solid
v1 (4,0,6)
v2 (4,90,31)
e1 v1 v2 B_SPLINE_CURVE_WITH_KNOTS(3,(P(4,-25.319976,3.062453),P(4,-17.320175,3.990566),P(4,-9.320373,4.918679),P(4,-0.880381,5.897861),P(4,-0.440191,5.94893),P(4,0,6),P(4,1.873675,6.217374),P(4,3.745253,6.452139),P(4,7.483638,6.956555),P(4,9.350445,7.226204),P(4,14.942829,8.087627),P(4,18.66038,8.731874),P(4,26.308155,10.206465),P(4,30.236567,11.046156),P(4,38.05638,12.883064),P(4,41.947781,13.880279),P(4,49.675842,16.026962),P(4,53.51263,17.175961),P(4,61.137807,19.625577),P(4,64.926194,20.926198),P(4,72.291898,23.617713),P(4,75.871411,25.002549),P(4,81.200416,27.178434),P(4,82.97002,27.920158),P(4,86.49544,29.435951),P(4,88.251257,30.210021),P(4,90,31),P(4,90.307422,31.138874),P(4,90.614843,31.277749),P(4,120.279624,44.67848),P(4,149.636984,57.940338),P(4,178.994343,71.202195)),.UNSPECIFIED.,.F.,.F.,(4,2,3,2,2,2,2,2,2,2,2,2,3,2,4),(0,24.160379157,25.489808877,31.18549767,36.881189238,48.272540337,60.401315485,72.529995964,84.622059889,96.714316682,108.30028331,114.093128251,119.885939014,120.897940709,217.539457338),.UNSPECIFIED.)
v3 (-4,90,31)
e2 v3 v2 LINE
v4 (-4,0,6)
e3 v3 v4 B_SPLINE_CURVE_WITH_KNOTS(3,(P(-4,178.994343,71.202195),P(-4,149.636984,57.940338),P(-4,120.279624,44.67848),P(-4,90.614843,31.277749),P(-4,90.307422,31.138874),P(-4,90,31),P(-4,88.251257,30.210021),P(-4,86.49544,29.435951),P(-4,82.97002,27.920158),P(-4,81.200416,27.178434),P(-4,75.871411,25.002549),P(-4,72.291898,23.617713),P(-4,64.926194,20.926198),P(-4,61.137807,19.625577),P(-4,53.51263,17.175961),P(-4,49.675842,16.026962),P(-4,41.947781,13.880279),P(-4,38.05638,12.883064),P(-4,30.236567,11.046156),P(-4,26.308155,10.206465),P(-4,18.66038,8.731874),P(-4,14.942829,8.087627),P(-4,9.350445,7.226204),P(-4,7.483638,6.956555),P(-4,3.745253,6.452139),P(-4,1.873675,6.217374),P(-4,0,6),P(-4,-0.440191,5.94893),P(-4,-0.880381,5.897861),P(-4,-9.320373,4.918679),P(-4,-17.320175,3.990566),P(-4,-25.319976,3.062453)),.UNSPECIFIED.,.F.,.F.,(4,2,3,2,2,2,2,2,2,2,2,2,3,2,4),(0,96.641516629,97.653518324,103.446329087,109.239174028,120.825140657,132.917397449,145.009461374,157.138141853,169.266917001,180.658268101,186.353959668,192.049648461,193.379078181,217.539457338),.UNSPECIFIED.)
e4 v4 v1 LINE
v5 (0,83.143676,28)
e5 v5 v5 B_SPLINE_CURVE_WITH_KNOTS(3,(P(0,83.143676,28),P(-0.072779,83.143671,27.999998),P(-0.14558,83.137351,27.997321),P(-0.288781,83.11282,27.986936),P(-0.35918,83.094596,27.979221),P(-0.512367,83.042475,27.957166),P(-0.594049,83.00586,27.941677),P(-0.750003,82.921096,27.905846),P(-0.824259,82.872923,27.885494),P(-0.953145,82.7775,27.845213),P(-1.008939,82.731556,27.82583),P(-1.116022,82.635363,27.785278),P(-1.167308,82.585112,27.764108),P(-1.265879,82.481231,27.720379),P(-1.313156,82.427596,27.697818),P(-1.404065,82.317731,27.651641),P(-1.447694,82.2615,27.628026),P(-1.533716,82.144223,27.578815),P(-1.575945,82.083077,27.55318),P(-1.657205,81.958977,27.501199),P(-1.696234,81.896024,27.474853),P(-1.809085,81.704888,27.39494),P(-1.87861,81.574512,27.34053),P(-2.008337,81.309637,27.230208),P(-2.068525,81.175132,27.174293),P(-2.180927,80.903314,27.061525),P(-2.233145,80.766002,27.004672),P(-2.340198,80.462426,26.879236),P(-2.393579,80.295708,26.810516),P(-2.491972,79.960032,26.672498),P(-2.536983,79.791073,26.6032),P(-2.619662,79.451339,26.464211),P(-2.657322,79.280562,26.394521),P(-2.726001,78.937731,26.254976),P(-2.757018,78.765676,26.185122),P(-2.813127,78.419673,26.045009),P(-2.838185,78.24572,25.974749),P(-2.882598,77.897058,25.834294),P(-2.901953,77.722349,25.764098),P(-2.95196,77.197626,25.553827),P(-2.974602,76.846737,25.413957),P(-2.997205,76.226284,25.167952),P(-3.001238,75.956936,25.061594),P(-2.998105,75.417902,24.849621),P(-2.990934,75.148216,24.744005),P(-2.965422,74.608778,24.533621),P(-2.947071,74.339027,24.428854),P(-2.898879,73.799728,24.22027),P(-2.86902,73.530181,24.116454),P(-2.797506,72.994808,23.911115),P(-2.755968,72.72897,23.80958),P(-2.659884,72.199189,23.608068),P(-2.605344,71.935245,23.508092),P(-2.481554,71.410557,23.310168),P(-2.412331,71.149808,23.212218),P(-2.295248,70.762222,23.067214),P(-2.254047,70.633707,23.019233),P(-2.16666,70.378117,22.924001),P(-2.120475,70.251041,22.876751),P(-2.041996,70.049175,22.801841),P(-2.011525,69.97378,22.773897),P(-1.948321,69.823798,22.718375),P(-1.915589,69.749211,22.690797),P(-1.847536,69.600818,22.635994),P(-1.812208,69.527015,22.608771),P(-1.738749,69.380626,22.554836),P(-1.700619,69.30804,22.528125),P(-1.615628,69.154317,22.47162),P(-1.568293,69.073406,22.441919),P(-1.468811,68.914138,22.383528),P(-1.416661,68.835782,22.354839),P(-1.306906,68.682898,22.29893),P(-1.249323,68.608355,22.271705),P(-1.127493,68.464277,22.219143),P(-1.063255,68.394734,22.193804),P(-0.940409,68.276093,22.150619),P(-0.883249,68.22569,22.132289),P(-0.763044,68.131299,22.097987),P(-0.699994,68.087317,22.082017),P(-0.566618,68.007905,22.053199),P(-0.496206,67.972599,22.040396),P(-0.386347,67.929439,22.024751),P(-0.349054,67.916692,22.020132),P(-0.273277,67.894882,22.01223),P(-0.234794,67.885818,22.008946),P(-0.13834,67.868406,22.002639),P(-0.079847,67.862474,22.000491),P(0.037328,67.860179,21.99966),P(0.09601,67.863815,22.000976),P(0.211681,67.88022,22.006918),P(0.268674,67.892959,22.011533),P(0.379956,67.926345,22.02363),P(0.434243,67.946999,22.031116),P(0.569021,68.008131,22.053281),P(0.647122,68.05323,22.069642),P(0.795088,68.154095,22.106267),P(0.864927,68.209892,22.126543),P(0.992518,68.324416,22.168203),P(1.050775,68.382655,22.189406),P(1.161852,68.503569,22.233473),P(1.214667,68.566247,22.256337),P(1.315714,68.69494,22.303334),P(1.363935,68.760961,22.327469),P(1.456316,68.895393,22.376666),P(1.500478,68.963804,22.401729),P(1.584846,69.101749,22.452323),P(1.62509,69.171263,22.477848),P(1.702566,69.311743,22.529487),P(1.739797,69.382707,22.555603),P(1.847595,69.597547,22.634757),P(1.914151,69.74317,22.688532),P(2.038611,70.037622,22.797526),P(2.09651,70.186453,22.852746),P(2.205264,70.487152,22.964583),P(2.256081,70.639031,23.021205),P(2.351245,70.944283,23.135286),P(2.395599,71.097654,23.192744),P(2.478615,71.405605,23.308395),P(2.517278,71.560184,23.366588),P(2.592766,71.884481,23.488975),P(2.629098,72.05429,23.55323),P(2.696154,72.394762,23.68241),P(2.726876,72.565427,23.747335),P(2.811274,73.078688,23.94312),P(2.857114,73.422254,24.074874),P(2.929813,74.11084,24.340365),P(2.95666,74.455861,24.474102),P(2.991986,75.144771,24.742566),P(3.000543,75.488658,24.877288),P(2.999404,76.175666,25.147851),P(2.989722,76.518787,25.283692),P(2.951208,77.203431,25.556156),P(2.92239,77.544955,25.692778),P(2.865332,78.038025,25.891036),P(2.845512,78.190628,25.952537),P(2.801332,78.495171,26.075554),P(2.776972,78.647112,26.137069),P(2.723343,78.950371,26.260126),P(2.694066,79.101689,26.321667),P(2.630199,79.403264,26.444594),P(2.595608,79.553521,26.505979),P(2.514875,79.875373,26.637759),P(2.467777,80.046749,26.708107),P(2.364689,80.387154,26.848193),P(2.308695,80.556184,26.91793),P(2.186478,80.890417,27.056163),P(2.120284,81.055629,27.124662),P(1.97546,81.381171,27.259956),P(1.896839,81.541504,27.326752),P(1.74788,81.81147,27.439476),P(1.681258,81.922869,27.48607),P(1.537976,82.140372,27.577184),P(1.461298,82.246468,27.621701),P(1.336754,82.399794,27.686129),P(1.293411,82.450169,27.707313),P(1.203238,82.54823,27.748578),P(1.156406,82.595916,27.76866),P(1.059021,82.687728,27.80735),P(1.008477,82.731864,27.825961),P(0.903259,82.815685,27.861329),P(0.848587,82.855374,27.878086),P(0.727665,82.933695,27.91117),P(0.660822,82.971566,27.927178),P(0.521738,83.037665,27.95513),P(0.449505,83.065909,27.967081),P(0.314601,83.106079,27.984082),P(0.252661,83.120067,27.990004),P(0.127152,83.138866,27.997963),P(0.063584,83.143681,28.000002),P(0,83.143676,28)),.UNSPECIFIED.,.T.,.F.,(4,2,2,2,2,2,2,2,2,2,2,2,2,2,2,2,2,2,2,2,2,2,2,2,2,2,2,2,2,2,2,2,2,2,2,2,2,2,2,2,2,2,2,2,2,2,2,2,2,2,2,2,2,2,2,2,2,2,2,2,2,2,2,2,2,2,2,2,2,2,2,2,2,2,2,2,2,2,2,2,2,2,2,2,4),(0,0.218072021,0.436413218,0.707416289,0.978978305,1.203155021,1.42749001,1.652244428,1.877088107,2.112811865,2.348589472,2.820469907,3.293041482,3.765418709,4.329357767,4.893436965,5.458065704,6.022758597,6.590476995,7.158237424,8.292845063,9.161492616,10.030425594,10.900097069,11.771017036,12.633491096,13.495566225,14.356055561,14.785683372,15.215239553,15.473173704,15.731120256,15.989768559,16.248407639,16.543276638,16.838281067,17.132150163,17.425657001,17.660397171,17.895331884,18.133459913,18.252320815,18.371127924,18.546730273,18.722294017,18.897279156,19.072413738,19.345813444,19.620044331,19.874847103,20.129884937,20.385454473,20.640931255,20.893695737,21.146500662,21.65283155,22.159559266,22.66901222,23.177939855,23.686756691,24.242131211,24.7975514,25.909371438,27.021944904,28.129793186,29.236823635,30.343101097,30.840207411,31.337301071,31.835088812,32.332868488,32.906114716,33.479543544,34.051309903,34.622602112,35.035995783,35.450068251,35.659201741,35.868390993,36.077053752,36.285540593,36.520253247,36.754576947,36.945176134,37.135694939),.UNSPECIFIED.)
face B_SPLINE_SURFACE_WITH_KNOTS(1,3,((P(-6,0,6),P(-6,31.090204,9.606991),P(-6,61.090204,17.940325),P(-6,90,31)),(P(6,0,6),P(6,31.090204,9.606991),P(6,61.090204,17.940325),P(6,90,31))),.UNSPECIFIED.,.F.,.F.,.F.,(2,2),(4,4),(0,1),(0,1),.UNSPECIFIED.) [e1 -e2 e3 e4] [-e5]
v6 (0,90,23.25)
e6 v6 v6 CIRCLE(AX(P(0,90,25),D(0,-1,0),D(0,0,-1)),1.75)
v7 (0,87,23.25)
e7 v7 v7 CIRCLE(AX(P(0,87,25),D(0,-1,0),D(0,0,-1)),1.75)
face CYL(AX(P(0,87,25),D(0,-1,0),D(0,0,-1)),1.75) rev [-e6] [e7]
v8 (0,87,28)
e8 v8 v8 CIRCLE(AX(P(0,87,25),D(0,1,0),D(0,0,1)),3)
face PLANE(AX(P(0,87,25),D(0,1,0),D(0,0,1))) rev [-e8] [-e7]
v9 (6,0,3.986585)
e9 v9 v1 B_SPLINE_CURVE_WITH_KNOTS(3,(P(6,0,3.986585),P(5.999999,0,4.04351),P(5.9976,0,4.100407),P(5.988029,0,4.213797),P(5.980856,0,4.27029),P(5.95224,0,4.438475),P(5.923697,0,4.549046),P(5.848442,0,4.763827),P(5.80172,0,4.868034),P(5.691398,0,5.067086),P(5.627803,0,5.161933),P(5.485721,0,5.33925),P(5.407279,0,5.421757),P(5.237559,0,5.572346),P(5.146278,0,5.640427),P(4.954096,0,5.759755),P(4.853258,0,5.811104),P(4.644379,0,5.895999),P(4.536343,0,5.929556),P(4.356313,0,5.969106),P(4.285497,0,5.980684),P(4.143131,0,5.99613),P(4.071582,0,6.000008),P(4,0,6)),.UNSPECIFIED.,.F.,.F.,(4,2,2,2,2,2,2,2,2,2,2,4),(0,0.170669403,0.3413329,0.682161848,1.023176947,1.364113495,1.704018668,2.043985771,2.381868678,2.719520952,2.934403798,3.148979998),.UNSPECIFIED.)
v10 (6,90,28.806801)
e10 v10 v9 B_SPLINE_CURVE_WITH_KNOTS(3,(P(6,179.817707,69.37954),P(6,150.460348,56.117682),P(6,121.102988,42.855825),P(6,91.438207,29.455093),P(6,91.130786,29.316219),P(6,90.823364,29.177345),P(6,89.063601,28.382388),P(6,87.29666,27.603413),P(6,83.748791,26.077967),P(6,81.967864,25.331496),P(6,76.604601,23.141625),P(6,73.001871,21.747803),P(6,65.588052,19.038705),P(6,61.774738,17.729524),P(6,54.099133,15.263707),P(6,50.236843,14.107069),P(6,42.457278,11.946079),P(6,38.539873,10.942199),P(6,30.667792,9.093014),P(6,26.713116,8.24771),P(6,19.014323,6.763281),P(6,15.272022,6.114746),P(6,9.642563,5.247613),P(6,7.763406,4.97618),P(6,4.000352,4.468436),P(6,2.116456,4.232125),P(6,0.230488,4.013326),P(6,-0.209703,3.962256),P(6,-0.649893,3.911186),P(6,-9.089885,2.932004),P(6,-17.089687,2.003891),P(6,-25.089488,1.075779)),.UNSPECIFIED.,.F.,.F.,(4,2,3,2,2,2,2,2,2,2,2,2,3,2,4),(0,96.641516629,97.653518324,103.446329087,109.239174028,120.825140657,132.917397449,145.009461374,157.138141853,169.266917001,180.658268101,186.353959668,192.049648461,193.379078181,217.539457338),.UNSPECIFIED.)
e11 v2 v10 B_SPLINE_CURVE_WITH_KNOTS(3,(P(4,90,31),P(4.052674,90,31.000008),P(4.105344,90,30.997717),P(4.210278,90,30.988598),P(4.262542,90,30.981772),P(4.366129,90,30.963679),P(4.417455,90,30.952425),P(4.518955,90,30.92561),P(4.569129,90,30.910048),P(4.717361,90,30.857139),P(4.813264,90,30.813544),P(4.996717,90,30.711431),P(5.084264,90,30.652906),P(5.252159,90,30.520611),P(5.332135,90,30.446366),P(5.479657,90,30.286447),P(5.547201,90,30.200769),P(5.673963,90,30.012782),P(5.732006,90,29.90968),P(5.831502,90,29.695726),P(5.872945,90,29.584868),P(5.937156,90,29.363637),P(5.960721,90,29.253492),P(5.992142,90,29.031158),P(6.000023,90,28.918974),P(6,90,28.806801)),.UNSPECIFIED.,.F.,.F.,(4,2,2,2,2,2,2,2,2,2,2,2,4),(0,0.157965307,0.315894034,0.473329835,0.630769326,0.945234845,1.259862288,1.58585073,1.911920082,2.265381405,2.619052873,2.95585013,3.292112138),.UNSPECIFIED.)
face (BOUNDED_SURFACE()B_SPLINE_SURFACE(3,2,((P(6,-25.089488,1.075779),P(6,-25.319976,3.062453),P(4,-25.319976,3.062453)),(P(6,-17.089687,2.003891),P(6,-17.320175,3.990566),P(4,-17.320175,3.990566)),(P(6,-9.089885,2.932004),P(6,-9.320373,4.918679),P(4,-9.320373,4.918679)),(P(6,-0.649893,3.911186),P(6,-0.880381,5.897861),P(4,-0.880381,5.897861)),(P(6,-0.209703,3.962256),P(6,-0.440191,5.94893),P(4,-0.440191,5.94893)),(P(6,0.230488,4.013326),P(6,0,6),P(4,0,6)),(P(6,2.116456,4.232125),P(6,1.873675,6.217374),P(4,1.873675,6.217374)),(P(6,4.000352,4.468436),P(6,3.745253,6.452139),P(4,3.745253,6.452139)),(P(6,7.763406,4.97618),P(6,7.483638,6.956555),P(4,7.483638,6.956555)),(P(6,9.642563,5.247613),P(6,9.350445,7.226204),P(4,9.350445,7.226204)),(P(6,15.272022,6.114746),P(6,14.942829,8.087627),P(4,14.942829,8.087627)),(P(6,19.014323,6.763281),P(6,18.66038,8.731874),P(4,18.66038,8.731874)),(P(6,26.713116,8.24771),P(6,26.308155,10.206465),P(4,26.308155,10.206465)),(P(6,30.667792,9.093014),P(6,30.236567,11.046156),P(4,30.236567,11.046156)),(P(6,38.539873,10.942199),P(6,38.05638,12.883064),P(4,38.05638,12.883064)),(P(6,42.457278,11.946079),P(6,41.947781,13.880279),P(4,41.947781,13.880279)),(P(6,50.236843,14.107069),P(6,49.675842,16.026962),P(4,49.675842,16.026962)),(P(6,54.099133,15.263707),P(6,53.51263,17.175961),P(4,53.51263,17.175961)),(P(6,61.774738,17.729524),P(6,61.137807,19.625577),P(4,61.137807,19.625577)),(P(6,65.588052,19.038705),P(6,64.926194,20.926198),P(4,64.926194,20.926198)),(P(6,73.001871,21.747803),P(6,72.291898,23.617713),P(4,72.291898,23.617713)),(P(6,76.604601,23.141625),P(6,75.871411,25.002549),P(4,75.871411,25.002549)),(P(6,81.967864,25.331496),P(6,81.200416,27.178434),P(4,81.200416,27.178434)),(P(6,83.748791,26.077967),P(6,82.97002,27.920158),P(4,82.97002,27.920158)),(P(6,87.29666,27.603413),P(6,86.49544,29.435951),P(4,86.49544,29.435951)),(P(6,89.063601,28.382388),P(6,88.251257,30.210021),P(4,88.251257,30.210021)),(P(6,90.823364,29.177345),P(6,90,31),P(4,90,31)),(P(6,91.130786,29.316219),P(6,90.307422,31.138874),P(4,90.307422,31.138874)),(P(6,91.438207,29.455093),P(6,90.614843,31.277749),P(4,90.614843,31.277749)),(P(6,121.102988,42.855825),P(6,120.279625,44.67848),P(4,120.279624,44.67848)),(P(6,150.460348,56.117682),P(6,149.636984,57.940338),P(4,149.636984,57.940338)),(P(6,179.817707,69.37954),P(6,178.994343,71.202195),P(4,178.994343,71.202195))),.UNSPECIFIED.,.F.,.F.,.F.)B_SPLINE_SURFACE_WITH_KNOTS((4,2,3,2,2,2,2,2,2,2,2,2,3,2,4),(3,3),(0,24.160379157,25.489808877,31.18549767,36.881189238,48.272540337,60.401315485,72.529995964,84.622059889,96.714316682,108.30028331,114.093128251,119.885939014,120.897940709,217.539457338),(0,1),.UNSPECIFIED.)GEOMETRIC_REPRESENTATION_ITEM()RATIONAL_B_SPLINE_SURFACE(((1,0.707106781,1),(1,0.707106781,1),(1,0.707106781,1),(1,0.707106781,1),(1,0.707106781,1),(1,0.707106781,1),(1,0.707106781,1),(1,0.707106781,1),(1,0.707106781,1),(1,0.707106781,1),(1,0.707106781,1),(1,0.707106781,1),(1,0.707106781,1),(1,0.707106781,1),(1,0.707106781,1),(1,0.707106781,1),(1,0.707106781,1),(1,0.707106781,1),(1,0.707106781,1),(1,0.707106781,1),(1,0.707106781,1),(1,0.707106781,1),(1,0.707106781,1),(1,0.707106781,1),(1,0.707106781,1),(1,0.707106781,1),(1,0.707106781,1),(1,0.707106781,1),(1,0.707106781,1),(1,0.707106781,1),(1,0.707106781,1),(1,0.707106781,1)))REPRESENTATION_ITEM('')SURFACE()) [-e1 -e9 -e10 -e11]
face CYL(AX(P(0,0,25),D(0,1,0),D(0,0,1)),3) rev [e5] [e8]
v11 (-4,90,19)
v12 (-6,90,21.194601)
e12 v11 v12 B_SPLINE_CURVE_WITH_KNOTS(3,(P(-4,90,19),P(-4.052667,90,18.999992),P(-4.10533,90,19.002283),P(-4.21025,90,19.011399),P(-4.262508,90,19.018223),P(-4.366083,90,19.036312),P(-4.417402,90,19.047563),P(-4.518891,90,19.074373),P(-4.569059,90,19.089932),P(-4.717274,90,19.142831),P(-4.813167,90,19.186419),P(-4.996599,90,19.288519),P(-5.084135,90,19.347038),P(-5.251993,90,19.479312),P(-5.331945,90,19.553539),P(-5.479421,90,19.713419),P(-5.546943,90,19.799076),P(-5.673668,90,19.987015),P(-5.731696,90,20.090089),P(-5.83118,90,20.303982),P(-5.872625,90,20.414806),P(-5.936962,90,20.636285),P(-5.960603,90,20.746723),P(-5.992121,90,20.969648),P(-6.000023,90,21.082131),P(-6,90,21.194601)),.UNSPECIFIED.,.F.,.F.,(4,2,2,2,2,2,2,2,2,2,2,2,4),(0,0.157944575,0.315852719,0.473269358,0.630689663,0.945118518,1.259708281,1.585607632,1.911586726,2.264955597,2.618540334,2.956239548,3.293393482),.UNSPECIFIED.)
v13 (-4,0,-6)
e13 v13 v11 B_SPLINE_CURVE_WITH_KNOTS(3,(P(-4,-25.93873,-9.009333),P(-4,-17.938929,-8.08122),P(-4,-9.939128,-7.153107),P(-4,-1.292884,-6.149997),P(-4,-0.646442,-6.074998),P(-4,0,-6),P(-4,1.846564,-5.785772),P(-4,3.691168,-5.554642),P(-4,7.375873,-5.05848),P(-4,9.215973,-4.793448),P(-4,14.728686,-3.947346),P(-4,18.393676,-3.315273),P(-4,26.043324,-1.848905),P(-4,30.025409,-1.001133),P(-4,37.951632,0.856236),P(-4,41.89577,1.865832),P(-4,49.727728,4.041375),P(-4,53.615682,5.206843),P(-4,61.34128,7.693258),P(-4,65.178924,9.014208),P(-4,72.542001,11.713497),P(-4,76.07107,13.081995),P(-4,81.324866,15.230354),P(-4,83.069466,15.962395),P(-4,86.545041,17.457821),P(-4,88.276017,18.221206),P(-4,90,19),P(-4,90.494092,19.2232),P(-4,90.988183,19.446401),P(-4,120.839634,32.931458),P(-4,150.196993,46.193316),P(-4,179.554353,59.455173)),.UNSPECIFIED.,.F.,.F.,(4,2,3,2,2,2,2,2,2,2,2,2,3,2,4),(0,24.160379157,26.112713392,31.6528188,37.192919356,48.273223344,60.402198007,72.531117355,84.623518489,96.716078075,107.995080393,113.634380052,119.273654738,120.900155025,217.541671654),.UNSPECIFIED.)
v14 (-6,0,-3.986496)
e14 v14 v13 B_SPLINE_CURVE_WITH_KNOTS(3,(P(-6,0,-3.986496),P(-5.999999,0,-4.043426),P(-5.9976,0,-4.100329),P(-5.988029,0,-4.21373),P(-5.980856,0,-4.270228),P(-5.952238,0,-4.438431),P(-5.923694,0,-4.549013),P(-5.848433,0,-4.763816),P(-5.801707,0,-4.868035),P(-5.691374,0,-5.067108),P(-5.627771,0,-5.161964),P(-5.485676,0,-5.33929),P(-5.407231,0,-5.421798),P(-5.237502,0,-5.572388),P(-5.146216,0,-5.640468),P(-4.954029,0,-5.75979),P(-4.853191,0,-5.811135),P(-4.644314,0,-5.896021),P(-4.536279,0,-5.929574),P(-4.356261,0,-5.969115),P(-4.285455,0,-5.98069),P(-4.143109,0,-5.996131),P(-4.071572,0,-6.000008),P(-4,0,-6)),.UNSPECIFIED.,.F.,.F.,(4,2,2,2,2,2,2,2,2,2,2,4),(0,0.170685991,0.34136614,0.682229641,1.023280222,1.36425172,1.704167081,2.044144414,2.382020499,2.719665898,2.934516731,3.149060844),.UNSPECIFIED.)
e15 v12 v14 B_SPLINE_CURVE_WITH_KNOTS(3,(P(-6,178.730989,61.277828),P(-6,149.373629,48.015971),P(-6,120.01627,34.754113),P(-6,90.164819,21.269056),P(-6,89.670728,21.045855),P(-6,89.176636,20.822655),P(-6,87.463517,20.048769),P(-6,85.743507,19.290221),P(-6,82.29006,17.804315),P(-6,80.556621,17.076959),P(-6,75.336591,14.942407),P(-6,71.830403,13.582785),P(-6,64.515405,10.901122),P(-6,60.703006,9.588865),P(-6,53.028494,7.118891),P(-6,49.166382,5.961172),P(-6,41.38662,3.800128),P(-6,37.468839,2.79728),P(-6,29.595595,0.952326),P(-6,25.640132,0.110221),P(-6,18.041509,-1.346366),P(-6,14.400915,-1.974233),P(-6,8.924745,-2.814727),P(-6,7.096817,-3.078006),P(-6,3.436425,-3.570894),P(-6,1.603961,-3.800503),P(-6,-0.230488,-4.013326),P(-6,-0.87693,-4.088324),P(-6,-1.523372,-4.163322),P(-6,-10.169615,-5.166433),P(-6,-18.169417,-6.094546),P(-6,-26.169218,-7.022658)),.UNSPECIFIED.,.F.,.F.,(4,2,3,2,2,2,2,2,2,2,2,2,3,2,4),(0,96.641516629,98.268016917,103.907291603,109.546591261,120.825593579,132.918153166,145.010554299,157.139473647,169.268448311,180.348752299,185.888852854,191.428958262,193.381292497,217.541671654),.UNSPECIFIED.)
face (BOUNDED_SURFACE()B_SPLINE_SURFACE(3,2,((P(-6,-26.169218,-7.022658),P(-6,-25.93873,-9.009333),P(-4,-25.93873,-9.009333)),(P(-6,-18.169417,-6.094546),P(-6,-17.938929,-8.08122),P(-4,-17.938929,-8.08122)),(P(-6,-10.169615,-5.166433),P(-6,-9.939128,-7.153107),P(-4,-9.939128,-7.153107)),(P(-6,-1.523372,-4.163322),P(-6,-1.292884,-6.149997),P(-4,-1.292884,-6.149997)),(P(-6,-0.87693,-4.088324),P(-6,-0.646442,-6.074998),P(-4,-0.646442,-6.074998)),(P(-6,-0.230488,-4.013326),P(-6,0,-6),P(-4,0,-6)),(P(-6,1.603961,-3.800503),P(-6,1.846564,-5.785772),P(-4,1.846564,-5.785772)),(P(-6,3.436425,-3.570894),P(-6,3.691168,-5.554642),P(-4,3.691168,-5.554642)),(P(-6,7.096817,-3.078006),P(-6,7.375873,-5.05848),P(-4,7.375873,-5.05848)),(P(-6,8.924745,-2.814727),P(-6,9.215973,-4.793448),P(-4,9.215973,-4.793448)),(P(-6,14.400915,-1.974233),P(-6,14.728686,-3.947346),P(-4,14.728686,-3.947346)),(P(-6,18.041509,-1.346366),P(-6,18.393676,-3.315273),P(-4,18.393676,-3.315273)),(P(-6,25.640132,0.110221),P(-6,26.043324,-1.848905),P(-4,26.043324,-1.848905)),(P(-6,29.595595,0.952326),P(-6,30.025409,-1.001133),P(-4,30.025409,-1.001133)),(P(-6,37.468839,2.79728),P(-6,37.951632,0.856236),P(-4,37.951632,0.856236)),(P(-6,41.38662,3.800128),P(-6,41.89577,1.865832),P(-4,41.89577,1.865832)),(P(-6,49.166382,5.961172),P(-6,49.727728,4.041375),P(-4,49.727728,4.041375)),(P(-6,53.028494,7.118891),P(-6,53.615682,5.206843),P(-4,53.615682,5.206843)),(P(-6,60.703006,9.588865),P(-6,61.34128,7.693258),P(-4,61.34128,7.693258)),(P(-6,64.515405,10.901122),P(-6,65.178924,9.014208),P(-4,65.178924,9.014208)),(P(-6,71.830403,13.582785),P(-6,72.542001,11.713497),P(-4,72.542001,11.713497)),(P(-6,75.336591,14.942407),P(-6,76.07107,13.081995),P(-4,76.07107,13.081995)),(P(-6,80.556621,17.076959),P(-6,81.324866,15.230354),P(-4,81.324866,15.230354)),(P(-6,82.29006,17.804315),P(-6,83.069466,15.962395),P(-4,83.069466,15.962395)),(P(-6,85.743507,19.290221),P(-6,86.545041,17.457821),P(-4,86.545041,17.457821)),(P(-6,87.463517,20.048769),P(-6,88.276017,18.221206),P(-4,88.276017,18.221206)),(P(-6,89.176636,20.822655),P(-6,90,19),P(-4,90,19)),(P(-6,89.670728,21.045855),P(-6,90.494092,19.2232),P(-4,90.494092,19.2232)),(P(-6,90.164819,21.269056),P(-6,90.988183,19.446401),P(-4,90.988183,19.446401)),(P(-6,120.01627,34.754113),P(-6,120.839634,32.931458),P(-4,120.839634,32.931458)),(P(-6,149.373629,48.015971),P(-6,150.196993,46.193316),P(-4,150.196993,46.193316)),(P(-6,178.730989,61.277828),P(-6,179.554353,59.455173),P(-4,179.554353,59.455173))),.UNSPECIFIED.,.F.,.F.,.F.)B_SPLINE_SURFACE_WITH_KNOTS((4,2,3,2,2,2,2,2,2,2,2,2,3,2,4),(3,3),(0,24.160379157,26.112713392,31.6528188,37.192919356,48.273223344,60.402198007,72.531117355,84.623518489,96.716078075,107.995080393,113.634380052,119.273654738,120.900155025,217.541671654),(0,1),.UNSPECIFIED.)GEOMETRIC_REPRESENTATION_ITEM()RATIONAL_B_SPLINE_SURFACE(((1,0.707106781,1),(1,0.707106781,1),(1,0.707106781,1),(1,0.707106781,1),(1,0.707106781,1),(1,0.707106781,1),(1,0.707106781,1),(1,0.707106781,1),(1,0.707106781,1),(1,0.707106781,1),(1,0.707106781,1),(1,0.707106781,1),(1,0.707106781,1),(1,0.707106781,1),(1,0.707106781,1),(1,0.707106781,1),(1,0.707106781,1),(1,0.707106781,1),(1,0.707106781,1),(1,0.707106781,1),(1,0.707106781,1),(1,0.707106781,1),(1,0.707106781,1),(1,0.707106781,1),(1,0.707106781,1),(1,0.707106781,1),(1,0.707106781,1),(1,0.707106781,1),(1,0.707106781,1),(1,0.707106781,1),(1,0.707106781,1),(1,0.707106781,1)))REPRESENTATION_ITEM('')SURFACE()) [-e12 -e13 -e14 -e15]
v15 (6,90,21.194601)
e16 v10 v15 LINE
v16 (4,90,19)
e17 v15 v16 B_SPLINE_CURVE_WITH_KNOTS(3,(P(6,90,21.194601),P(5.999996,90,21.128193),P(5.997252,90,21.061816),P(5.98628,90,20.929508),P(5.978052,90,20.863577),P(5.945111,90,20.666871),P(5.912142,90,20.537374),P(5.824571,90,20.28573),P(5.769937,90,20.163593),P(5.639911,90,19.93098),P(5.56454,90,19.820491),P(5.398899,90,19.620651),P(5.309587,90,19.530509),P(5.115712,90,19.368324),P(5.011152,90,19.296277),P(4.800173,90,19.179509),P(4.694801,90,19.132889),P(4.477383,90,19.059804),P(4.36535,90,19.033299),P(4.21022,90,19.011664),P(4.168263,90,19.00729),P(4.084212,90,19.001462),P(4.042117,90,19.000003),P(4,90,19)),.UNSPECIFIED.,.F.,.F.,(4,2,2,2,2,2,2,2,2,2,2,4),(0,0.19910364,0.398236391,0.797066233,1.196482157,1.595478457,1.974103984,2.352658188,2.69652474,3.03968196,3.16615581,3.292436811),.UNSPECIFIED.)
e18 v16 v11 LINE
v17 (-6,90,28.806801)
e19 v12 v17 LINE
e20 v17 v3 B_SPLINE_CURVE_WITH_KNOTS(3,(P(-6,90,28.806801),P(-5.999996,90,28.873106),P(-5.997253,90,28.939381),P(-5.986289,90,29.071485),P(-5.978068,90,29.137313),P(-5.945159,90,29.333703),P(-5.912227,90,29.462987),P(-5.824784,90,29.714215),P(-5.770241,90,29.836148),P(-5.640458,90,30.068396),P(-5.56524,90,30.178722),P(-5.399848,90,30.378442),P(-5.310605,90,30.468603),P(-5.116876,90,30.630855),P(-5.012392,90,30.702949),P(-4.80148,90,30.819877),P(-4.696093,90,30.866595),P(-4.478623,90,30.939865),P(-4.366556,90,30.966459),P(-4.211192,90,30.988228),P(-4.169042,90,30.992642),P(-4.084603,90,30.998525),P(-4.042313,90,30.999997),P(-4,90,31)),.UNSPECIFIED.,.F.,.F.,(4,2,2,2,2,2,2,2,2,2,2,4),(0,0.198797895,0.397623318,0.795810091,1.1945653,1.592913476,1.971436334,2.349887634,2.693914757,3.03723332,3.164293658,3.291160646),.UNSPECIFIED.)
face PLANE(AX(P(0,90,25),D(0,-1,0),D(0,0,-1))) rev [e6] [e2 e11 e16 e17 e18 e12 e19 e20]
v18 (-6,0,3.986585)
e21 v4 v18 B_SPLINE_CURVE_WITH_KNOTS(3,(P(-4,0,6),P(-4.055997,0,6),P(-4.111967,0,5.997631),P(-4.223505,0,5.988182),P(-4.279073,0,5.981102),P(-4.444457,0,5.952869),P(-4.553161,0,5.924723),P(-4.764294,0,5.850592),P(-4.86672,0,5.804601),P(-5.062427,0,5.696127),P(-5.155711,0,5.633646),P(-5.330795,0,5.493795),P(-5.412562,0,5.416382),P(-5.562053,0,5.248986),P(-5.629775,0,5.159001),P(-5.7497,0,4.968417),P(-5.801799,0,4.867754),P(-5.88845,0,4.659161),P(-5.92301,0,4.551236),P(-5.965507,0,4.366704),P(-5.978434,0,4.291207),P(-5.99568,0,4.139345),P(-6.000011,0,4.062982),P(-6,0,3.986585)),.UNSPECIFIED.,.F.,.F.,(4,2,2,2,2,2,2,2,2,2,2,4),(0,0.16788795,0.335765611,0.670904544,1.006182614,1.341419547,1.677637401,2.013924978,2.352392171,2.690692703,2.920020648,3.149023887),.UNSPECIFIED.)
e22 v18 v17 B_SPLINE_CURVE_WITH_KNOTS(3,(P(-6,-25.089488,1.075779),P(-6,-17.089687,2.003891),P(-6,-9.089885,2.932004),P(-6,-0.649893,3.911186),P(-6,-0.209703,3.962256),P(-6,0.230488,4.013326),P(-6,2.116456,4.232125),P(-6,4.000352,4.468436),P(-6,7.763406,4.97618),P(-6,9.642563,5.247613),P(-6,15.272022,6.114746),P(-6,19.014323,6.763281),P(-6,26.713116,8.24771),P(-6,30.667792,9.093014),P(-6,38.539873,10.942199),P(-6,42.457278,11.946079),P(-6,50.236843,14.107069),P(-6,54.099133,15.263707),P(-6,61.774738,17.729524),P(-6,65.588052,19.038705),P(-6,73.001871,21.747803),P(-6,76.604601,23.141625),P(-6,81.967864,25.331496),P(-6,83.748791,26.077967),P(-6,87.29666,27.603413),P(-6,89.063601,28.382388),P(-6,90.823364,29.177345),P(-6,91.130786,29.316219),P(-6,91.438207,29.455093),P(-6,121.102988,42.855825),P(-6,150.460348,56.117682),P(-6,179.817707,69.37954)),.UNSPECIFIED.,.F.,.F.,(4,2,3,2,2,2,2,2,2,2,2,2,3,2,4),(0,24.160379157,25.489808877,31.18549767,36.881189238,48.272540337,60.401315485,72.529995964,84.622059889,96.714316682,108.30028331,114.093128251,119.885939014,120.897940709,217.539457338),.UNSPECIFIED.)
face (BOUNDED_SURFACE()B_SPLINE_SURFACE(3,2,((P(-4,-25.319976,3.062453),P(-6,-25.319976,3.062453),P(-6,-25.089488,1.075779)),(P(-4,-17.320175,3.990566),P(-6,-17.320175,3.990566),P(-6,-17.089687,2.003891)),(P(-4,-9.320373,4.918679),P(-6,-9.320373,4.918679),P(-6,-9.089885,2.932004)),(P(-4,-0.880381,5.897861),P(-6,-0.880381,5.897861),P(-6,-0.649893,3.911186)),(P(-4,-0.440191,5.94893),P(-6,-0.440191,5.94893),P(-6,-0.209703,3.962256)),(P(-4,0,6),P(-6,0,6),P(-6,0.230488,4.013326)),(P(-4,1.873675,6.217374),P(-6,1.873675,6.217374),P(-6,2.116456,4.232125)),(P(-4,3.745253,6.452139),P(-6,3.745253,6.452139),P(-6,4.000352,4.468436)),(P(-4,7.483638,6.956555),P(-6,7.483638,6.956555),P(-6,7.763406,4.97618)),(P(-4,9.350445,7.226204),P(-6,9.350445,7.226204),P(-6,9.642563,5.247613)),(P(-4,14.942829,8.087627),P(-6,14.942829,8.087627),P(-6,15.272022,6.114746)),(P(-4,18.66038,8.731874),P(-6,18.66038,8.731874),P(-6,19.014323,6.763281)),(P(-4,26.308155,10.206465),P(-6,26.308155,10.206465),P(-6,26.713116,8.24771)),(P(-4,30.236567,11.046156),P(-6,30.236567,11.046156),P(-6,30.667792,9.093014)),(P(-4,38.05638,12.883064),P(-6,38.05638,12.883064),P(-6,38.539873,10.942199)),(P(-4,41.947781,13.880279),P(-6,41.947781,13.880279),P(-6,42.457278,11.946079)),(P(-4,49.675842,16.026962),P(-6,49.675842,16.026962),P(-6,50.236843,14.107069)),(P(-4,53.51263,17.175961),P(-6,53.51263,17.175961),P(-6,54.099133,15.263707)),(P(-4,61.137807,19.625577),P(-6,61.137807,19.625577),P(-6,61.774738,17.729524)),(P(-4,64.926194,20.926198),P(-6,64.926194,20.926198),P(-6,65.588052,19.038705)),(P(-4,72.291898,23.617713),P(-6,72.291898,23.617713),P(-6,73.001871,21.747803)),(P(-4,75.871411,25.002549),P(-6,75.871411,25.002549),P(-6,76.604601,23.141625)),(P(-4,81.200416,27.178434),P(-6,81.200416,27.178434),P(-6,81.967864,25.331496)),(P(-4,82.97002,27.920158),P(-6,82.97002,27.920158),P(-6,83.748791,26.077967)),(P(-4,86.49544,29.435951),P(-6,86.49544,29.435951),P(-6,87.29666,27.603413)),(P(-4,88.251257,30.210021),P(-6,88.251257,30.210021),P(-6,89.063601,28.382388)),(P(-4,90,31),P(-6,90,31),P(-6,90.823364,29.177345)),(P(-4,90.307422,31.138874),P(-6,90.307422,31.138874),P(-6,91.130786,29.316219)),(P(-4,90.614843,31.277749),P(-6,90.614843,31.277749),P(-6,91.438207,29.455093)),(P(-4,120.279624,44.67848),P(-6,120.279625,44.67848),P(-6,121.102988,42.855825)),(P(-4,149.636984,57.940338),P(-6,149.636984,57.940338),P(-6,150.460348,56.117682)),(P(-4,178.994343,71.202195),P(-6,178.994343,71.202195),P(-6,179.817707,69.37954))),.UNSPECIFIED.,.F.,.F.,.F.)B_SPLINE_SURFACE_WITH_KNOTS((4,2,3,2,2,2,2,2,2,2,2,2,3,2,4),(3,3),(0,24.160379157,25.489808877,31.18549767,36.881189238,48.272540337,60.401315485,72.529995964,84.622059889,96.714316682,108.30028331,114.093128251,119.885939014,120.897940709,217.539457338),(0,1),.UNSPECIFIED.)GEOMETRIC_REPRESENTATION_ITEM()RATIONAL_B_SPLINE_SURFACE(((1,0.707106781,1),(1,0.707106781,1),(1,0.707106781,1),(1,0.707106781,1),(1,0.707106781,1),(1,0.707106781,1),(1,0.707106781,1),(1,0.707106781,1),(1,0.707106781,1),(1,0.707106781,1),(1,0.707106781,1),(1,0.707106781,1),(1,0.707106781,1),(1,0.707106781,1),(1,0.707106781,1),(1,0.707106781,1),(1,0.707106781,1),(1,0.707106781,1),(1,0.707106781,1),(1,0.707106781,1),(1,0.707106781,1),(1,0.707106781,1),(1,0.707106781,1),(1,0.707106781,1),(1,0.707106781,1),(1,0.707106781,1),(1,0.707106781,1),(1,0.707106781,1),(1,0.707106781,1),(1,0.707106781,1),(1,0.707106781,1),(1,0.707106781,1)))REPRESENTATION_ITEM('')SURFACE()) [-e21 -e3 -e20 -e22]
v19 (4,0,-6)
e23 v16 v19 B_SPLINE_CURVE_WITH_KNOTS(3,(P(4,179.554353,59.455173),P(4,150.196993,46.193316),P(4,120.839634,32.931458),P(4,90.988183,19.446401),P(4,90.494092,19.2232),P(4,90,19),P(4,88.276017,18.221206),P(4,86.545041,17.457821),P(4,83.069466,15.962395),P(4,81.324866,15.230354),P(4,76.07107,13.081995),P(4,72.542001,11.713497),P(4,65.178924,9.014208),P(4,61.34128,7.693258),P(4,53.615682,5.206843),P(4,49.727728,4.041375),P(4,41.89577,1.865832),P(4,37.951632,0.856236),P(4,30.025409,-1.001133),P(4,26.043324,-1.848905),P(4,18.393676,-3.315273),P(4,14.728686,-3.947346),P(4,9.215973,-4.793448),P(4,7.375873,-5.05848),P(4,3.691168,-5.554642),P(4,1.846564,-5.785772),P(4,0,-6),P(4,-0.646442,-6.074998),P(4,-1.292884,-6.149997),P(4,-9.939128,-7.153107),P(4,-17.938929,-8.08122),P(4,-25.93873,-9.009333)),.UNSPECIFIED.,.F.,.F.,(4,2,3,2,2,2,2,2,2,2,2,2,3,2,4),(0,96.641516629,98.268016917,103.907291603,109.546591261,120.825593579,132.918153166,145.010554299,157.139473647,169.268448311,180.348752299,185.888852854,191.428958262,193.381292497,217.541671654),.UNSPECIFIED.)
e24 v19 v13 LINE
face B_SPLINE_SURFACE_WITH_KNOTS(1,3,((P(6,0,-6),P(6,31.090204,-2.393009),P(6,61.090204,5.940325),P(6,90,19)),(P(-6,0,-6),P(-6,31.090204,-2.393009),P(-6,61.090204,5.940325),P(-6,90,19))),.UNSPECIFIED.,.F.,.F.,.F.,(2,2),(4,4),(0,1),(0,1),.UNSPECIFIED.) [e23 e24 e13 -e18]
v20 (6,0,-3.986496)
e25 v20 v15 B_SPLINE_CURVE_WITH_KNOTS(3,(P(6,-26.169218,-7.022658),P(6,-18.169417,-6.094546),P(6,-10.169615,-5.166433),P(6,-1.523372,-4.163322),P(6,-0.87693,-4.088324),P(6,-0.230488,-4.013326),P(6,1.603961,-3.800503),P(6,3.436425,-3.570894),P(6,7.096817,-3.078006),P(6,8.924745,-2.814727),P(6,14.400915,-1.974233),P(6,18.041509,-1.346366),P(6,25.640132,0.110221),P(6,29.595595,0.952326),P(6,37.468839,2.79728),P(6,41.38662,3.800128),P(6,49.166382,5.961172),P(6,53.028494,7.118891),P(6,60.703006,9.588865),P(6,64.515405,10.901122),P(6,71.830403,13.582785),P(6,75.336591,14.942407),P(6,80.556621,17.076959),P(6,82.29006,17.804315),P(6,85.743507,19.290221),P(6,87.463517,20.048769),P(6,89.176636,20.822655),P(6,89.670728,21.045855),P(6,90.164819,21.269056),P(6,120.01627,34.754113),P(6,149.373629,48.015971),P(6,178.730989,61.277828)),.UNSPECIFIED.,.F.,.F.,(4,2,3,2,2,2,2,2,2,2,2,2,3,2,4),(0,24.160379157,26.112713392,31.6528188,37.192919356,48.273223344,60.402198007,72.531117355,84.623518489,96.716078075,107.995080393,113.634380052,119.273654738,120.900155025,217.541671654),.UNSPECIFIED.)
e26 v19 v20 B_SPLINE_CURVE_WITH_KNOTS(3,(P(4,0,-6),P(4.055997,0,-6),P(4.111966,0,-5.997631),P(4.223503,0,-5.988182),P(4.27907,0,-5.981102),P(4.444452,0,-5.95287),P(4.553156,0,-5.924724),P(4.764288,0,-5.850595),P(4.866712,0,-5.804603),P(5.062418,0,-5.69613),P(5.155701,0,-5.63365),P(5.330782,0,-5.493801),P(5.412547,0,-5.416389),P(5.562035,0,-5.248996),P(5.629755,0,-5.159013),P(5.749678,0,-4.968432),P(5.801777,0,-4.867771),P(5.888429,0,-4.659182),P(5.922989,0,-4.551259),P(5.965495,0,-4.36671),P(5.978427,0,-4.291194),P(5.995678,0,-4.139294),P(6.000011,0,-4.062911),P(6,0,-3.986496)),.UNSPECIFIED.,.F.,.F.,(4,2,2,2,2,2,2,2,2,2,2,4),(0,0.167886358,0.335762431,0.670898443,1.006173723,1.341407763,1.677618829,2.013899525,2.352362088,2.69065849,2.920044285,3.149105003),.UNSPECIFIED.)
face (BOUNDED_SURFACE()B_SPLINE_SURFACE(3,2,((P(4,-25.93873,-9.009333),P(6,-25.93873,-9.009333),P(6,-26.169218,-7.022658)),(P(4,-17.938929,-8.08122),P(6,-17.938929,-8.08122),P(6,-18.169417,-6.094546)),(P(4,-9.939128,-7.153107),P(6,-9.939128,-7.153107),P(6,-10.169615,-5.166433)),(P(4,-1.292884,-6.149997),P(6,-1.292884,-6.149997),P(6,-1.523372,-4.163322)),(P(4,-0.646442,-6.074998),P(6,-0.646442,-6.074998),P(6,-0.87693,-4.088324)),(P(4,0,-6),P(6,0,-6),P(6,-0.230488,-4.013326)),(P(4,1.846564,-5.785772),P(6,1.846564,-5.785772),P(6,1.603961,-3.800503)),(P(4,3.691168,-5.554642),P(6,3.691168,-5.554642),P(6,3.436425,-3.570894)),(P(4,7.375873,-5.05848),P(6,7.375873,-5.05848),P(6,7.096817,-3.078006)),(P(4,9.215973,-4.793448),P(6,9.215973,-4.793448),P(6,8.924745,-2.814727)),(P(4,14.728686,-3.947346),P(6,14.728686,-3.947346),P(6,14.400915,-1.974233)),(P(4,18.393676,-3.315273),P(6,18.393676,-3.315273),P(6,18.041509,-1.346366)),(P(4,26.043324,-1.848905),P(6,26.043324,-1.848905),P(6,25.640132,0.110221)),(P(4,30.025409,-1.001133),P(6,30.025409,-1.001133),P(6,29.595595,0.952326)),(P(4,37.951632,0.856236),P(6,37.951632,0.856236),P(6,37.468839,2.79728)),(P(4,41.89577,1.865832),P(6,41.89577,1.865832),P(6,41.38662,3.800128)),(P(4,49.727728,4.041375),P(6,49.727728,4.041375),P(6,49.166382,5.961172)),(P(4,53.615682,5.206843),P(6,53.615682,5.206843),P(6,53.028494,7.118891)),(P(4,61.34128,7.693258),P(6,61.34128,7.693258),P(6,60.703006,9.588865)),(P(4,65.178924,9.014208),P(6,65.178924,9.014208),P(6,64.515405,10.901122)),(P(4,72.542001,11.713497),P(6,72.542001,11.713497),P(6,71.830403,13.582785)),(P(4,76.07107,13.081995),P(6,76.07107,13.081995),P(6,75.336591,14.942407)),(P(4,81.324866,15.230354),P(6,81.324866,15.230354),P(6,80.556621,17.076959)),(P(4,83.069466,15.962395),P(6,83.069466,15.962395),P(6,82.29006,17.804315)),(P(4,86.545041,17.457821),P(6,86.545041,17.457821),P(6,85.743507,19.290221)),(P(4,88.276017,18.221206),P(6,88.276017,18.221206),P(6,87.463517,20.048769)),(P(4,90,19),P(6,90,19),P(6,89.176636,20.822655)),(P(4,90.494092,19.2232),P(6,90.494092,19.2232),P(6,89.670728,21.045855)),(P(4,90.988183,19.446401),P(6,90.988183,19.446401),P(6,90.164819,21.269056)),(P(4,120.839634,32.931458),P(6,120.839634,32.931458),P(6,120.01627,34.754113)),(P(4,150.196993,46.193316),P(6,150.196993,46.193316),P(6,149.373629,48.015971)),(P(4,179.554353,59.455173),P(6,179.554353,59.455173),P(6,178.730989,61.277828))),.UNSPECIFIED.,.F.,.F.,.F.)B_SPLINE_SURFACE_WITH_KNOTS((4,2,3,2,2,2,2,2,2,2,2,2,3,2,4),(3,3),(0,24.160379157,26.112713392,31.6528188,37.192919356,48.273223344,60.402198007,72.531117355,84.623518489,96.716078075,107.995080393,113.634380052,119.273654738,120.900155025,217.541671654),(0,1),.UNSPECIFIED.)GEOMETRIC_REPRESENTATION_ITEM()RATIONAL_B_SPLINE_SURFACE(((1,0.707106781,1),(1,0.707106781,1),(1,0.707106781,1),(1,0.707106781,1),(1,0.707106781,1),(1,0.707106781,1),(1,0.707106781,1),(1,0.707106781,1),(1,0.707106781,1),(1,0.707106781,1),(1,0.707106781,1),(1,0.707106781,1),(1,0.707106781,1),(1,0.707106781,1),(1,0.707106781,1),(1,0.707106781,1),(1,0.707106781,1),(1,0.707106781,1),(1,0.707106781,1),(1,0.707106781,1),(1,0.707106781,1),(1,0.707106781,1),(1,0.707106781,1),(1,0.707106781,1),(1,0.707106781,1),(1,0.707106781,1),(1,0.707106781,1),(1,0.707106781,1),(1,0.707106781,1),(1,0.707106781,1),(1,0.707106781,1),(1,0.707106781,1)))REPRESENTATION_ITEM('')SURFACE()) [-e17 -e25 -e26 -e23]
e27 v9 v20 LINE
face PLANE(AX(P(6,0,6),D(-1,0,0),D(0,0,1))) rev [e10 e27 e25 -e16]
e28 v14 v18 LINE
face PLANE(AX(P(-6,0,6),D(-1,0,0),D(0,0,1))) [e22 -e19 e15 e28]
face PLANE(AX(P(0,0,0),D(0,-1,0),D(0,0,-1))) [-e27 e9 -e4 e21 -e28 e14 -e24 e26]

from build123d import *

# Parameters (mm, degrees)
SWEEP1_START               = -6
SWEEP1_DEPTH               = 12
SKETCH3_R                  = 3
CUT_EXTRUDE1_DEPTH         = 93.552687831
F_3_5_3_5_DIAMETER_HOLE1_D = 3.5
FILLET2_R                  = 2


# Read off the part's stored shape, not the designer's step: Sweep1
with BuildPart() as part:
    # Sweep1 outline → Sweep1 (new body)
    with BuildSketch(Plane.YZ.offset(SWEEP1_START)):
        with BuildLine():
            add(Edge.make_bspline(
                [(0, 6), (31.090204345, 9.606991211), (61.090204345, 17.940324544), (90, 31)],
                knots=[0, 0, 0, 0, 1, 1, 1, 1], degree=3))
            Line((0, 6), (0, -6))
            add(Edge.make_bspline(
                [(0, -6), (31.090204345, -2.393008789), (61.090204345, 5.940324544), (90, 19)],
                knots=[0, 0, 0, 0, 1, 1, 1, 1], degree=3))
            Line((90, 19), (90, 31))
        make_face()
    extrude(amount=SWEEP1_DEPTH)

    # Sketch3 → Cut-Extrude1 (cut, through all)
    with BuildSketch(Plane(origin=(0, 87, 0), x_dir=(1, 0, 0), z_dir=(0, 1, 0))):
        with Locations(Location((0, -25, 0), (0, 0, 270))):
            Circle(SKETCH3_R)
    extrude(amount=-CUT_EXTRUDE1_DEPTH, mode=Mode.SUBTRACT)

    # Ø3.5 (3.5) Diameter Hole1 (through all)
    with Locations(Plane(origin=(0, 87, 0), x_dir=(-1, 0, 0), z_dir=(0, -1, 0))):
        with Locations((0, -25)):
            Hole(F_3_5_3_5_DIAMETER_HOLE1_D / 2)

    # Fillet2
    fillet2_edges = [part.edges().sort_by_distance(p)[0] for p in [
        (6, 45.971752724, 14.998093053),
        (6, 45.971752724, 2.998093053),
        (-6, 45.971752724, 2.998093053),
        (-6, 45.971752724, 14.998093053),
    ]]
    fillet(fillet2_edges, radius=FILLET2_R)


solid = part.part
